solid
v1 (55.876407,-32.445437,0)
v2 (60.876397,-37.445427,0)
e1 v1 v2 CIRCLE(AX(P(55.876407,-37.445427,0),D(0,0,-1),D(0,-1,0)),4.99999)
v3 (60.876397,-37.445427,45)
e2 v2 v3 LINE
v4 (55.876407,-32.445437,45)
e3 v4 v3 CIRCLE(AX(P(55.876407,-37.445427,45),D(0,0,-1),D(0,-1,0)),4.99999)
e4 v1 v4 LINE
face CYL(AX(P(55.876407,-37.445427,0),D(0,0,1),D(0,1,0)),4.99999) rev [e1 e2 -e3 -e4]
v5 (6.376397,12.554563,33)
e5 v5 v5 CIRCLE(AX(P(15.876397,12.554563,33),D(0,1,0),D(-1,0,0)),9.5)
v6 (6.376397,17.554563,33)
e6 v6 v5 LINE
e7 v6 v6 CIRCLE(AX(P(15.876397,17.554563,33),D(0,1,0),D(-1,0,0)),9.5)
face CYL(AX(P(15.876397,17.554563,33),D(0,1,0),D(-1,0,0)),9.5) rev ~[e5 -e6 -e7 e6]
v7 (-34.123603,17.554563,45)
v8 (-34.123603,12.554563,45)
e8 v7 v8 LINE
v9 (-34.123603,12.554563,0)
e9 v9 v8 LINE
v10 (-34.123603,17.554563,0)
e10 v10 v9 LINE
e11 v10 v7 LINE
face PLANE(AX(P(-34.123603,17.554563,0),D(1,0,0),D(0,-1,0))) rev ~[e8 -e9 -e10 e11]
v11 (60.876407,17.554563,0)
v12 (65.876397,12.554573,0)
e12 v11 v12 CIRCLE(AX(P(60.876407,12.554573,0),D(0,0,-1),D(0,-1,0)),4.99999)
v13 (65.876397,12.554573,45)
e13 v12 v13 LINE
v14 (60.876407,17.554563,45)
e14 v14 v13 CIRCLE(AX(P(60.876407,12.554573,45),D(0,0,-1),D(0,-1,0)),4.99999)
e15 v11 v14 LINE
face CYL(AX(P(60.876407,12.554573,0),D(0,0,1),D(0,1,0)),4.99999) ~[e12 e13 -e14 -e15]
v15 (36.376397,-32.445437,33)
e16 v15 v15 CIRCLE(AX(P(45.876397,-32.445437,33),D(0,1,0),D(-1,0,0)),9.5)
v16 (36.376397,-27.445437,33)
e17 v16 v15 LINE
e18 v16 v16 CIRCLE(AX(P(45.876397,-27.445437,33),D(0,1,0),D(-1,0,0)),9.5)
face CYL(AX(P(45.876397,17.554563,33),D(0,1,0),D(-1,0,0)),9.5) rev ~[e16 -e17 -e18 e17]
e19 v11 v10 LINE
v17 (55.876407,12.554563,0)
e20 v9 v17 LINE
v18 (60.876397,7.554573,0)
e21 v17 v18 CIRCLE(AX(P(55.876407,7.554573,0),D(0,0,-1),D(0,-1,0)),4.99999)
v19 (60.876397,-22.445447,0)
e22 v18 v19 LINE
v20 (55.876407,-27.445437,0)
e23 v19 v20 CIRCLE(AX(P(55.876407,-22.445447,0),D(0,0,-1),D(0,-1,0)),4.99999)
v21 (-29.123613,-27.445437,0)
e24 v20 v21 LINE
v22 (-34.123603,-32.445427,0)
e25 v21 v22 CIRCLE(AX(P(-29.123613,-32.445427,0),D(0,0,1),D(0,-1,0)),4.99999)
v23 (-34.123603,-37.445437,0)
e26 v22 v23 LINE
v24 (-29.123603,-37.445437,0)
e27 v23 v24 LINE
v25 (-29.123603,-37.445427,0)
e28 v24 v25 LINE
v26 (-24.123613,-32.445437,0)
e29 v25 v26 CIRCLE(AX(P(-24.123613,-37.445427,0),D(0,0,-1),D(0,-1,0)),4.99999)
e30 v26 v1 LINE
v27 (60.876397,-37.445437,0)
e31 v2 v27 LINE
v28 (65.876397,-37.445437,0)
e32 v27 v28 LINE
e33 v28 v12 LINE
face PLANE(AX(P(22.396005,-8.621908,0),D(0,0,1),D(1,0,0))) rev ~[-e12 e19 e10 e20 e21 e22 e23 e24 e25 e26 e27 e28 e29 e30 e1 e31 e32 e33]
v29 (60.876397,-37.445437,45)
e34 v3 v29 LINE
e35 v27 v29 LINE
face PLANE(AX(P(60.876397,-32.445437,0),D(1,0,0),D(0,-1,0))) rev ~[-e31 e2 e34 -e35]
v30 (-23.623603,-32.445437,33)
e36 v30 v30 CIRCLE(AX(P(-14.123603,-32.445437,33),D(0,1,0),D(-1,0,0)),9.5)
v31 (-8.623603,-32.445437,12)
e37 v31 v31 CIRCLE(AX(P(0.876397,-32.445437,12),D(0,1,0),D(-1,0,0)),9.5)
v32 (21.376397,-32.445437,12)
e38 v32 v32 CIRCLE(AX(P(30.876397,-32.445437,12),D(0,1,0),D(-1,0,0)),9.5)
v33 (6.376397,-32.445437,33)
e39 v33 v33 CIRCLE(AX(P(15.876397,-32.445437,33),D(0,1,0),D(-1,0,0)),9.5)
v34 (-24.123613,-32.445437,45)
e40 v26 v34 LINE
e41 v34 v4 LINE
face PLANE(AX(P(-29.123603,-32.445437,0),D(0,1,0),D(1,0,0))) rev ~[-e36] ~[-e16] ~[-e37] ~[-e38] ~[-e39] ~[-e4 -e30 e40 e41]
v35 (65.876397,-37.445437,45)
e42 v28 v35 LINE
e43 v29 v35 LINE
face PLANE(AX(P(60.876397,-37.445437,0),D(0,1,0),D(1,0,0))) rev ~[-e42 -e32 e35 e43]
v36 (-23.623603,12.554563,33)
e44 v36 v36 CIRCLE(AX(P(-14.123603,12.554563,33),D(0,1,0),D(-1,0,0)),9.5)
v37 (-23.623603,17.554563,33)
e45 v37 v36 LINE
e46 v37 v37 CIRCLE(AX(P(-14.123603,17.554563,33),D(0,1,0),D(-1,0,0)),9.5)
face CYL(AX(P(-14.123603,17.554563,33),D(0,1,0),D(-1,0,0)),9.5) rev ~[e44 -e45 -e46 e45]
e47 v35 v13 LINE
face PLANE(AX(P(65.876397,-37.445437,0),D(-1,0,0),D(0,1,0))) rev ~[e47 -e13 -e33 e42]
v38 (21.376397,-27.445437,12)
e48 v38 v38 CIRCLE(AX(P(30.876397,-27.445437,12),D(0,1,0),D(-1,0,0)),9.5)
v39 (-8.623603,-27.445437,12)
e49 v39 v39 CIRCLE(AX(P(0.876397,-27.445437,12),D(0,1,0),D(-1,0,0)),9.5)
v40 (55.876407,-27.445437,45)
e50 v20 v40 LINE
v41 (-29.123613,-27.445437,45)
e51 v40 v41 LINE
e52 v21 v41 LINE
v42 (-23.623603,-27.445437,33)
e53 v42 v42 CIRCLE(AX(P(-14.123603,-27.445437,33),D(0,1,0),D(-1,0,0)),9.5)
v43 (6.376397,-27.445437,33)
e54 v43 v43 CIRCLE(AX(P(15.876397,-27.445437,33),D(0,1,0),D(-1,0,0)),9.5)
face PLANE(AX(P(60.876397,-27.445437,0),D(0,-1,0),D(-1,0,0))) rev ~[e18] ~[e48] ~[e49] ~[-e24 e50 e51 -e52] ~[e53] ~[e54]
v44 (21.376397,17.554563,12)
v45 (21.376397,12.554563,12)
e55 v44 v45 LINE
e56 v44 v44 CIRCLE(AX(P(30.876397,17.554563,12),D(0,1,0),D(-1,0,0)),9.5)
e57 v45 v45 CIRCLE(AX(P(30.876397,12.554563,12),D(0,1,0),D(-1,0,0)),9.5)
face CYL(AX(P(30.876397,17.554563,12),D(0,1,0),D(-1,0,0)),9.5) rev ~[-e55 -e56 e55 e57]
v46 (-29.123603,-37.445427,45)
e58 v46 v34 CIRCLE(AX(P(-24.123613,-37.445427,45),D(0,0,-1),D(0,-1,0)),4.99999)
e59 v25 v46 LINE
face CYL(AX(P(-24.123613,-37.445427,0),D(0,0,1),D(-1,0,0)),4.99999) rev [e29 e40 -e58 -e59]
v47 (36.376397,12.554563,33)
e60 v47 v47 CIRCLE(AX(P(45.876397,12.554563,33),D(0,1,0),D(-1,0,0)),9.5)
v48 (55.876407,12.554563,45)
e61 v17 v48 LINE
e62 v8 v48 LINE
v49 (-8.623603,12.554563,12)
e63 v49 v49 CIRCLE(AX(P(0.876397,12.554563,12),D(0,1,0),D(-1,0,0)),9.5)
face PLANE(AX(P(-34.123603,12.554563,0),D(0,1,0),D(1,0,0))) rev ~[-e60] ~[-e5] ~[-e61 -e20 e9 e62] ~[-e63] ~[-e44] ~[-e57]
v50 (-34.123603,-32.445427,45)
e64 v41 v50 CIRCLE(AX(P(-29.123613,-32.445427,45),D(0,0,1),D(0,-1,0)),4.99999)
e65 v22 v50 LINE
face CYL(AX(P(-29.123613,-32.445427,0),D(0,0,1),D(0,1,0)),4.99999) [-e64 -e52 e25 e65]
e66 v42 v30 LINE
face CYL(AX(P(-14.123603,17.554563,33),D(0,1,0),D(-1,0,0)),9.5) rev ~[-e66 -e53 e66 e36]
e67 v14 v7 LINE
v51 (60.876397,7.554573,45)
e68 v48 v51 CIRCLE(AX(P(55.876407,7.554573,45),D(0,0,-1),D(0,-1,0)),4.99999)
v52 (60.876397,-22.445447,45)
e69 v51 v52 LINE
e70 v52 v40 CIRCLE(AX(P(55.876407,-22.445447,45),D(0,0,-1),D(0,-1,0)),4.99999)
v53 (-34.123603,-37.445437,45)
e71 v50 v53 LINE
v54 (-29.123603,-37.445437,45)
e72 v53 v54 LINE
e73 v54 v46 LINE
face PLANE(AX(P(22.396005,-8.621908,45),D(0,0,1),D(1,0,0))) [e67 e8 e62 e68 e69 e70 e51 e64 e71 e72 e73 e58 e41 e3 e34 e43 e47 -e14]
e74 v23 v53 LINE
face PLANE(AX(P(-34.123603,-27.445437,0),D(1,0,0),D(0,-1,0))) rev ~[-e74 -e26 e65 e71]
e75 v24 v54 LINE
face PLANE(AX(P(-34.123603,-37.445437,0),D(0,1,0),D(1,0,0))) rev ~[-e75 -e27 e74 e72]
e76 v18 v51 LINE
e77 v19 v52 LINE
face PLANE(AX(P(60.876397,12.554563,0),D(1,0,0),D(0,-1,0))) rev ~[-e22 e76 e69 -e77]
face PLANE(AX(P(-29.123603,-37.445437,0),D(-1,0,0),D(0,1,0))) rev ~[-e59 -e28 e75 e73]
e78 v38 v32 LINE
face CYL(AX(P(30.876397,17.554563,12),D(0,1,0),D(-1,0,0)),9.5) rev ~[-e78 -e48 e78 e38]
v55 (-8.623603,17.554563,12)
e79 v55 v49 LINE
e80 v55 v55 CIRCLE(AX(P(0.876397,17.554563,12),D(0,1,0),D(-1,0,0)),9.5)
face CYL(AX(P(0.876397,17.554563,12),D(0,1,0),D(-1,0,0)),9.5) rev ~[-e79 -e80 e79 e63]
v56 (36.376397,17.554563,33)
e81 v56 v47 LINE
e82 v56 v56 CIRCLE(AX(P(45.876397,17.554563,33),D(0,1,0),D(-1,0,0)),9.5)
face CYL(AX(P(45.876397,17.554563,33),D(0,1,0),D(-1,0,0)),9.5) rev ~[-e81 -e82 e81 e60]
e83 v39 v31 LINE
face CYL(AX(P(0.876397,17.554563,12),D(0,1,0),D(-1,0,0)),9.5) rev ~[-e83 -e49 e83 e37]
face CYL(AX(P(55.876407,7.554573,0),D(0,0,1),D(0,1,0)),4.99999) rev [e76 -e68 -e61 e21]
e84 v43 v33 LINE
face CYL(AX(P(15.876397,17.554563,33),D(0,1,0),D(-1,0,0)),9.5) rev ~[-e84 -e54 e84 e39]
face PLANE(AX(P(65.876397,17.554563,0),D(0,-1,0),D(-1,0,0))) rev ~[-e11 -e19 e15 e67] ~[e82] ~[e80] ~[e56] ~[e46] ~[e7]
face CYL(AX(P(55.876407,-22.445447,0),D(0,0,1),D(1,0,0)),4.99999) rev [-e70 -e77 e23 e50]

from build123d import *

# Parameters (mm, degrees)
F1_DEPTH = 45
F2_R     = 4.99999
F3_R     = 9.5
F4_DEPTH = 80


# Not quite as in the source:
# - a fillet or chamfer is up to 0.001 mm smaller than in the source, because OpenCascade refuses the exact size


with BuildPart() as f1:
    # F0 (on Top) → F1 (new body)
    with BuildSketch(Plane.XY):
        Polygon((65.8763971276, 17.5545628369), (-34.1236028724, 17.5545628369), (-34.1236028724, 12.5545628369), (60.8763971276, 12.5545628369), (60.8763971276, -27.4454371631), (-34.1236028724, -27.4454371631), (-34.1236028724, -32.4454371631), (-34.1236028724, -37.4454371631), (-29.1236028724, -37.4454371631), (-29.1236028724, -32.4454371631), (60.8763971276, -32.4454371631), (60.8763971276, -37.4454371631), (65.8763971276, -37.4454371631), (65.8763971276, -32.4454371631), align=None)
    extrude(amount=F1_DEPTH)

    # F2 (radius 5 in the source; OpenCascade refuses exactly that, so slightly less here)
    f2_edges = [f1.edges().sort_by_distance(p)[0] for p in [
        (60.876397, 12.554563, 22.5),
        (60.876397, -27.445437, 22.5),
        (65.876397, 17.554563, 22.5),
        (60.876397, -32.445437, 22.5),
        (-29.123603, -32.445437, 22.5),
        (-34.123603, -27.445437, 22.5),
    ]]
    fillet(f2_edges, radius=F2_R)

    # F3 (on face) → F4 (cut)
    with BuildSketch(Plane(origin=(0, 17.5545628369, 0), x_dir=(-1, 0, 0), z_dir=(0, 1, 0))):
        with Locations((-45.8763971276, 33)):
            Circle(F3_R)
        with Locations((-0.8763971276, 12)):
            Circle(F3_R)
        with Locations((14.1236028724, 33)):
            Circle(F3_R)
        with Locations((-30.8763971276, 12)):
            Circle(F3_R)
        with Locations((-15.8763971276, 33)):
            Circle(F3_R)
    extrude(amount=-F4_DEPTH, mode=Mode.SUBTRACT)


solid = f1.part
